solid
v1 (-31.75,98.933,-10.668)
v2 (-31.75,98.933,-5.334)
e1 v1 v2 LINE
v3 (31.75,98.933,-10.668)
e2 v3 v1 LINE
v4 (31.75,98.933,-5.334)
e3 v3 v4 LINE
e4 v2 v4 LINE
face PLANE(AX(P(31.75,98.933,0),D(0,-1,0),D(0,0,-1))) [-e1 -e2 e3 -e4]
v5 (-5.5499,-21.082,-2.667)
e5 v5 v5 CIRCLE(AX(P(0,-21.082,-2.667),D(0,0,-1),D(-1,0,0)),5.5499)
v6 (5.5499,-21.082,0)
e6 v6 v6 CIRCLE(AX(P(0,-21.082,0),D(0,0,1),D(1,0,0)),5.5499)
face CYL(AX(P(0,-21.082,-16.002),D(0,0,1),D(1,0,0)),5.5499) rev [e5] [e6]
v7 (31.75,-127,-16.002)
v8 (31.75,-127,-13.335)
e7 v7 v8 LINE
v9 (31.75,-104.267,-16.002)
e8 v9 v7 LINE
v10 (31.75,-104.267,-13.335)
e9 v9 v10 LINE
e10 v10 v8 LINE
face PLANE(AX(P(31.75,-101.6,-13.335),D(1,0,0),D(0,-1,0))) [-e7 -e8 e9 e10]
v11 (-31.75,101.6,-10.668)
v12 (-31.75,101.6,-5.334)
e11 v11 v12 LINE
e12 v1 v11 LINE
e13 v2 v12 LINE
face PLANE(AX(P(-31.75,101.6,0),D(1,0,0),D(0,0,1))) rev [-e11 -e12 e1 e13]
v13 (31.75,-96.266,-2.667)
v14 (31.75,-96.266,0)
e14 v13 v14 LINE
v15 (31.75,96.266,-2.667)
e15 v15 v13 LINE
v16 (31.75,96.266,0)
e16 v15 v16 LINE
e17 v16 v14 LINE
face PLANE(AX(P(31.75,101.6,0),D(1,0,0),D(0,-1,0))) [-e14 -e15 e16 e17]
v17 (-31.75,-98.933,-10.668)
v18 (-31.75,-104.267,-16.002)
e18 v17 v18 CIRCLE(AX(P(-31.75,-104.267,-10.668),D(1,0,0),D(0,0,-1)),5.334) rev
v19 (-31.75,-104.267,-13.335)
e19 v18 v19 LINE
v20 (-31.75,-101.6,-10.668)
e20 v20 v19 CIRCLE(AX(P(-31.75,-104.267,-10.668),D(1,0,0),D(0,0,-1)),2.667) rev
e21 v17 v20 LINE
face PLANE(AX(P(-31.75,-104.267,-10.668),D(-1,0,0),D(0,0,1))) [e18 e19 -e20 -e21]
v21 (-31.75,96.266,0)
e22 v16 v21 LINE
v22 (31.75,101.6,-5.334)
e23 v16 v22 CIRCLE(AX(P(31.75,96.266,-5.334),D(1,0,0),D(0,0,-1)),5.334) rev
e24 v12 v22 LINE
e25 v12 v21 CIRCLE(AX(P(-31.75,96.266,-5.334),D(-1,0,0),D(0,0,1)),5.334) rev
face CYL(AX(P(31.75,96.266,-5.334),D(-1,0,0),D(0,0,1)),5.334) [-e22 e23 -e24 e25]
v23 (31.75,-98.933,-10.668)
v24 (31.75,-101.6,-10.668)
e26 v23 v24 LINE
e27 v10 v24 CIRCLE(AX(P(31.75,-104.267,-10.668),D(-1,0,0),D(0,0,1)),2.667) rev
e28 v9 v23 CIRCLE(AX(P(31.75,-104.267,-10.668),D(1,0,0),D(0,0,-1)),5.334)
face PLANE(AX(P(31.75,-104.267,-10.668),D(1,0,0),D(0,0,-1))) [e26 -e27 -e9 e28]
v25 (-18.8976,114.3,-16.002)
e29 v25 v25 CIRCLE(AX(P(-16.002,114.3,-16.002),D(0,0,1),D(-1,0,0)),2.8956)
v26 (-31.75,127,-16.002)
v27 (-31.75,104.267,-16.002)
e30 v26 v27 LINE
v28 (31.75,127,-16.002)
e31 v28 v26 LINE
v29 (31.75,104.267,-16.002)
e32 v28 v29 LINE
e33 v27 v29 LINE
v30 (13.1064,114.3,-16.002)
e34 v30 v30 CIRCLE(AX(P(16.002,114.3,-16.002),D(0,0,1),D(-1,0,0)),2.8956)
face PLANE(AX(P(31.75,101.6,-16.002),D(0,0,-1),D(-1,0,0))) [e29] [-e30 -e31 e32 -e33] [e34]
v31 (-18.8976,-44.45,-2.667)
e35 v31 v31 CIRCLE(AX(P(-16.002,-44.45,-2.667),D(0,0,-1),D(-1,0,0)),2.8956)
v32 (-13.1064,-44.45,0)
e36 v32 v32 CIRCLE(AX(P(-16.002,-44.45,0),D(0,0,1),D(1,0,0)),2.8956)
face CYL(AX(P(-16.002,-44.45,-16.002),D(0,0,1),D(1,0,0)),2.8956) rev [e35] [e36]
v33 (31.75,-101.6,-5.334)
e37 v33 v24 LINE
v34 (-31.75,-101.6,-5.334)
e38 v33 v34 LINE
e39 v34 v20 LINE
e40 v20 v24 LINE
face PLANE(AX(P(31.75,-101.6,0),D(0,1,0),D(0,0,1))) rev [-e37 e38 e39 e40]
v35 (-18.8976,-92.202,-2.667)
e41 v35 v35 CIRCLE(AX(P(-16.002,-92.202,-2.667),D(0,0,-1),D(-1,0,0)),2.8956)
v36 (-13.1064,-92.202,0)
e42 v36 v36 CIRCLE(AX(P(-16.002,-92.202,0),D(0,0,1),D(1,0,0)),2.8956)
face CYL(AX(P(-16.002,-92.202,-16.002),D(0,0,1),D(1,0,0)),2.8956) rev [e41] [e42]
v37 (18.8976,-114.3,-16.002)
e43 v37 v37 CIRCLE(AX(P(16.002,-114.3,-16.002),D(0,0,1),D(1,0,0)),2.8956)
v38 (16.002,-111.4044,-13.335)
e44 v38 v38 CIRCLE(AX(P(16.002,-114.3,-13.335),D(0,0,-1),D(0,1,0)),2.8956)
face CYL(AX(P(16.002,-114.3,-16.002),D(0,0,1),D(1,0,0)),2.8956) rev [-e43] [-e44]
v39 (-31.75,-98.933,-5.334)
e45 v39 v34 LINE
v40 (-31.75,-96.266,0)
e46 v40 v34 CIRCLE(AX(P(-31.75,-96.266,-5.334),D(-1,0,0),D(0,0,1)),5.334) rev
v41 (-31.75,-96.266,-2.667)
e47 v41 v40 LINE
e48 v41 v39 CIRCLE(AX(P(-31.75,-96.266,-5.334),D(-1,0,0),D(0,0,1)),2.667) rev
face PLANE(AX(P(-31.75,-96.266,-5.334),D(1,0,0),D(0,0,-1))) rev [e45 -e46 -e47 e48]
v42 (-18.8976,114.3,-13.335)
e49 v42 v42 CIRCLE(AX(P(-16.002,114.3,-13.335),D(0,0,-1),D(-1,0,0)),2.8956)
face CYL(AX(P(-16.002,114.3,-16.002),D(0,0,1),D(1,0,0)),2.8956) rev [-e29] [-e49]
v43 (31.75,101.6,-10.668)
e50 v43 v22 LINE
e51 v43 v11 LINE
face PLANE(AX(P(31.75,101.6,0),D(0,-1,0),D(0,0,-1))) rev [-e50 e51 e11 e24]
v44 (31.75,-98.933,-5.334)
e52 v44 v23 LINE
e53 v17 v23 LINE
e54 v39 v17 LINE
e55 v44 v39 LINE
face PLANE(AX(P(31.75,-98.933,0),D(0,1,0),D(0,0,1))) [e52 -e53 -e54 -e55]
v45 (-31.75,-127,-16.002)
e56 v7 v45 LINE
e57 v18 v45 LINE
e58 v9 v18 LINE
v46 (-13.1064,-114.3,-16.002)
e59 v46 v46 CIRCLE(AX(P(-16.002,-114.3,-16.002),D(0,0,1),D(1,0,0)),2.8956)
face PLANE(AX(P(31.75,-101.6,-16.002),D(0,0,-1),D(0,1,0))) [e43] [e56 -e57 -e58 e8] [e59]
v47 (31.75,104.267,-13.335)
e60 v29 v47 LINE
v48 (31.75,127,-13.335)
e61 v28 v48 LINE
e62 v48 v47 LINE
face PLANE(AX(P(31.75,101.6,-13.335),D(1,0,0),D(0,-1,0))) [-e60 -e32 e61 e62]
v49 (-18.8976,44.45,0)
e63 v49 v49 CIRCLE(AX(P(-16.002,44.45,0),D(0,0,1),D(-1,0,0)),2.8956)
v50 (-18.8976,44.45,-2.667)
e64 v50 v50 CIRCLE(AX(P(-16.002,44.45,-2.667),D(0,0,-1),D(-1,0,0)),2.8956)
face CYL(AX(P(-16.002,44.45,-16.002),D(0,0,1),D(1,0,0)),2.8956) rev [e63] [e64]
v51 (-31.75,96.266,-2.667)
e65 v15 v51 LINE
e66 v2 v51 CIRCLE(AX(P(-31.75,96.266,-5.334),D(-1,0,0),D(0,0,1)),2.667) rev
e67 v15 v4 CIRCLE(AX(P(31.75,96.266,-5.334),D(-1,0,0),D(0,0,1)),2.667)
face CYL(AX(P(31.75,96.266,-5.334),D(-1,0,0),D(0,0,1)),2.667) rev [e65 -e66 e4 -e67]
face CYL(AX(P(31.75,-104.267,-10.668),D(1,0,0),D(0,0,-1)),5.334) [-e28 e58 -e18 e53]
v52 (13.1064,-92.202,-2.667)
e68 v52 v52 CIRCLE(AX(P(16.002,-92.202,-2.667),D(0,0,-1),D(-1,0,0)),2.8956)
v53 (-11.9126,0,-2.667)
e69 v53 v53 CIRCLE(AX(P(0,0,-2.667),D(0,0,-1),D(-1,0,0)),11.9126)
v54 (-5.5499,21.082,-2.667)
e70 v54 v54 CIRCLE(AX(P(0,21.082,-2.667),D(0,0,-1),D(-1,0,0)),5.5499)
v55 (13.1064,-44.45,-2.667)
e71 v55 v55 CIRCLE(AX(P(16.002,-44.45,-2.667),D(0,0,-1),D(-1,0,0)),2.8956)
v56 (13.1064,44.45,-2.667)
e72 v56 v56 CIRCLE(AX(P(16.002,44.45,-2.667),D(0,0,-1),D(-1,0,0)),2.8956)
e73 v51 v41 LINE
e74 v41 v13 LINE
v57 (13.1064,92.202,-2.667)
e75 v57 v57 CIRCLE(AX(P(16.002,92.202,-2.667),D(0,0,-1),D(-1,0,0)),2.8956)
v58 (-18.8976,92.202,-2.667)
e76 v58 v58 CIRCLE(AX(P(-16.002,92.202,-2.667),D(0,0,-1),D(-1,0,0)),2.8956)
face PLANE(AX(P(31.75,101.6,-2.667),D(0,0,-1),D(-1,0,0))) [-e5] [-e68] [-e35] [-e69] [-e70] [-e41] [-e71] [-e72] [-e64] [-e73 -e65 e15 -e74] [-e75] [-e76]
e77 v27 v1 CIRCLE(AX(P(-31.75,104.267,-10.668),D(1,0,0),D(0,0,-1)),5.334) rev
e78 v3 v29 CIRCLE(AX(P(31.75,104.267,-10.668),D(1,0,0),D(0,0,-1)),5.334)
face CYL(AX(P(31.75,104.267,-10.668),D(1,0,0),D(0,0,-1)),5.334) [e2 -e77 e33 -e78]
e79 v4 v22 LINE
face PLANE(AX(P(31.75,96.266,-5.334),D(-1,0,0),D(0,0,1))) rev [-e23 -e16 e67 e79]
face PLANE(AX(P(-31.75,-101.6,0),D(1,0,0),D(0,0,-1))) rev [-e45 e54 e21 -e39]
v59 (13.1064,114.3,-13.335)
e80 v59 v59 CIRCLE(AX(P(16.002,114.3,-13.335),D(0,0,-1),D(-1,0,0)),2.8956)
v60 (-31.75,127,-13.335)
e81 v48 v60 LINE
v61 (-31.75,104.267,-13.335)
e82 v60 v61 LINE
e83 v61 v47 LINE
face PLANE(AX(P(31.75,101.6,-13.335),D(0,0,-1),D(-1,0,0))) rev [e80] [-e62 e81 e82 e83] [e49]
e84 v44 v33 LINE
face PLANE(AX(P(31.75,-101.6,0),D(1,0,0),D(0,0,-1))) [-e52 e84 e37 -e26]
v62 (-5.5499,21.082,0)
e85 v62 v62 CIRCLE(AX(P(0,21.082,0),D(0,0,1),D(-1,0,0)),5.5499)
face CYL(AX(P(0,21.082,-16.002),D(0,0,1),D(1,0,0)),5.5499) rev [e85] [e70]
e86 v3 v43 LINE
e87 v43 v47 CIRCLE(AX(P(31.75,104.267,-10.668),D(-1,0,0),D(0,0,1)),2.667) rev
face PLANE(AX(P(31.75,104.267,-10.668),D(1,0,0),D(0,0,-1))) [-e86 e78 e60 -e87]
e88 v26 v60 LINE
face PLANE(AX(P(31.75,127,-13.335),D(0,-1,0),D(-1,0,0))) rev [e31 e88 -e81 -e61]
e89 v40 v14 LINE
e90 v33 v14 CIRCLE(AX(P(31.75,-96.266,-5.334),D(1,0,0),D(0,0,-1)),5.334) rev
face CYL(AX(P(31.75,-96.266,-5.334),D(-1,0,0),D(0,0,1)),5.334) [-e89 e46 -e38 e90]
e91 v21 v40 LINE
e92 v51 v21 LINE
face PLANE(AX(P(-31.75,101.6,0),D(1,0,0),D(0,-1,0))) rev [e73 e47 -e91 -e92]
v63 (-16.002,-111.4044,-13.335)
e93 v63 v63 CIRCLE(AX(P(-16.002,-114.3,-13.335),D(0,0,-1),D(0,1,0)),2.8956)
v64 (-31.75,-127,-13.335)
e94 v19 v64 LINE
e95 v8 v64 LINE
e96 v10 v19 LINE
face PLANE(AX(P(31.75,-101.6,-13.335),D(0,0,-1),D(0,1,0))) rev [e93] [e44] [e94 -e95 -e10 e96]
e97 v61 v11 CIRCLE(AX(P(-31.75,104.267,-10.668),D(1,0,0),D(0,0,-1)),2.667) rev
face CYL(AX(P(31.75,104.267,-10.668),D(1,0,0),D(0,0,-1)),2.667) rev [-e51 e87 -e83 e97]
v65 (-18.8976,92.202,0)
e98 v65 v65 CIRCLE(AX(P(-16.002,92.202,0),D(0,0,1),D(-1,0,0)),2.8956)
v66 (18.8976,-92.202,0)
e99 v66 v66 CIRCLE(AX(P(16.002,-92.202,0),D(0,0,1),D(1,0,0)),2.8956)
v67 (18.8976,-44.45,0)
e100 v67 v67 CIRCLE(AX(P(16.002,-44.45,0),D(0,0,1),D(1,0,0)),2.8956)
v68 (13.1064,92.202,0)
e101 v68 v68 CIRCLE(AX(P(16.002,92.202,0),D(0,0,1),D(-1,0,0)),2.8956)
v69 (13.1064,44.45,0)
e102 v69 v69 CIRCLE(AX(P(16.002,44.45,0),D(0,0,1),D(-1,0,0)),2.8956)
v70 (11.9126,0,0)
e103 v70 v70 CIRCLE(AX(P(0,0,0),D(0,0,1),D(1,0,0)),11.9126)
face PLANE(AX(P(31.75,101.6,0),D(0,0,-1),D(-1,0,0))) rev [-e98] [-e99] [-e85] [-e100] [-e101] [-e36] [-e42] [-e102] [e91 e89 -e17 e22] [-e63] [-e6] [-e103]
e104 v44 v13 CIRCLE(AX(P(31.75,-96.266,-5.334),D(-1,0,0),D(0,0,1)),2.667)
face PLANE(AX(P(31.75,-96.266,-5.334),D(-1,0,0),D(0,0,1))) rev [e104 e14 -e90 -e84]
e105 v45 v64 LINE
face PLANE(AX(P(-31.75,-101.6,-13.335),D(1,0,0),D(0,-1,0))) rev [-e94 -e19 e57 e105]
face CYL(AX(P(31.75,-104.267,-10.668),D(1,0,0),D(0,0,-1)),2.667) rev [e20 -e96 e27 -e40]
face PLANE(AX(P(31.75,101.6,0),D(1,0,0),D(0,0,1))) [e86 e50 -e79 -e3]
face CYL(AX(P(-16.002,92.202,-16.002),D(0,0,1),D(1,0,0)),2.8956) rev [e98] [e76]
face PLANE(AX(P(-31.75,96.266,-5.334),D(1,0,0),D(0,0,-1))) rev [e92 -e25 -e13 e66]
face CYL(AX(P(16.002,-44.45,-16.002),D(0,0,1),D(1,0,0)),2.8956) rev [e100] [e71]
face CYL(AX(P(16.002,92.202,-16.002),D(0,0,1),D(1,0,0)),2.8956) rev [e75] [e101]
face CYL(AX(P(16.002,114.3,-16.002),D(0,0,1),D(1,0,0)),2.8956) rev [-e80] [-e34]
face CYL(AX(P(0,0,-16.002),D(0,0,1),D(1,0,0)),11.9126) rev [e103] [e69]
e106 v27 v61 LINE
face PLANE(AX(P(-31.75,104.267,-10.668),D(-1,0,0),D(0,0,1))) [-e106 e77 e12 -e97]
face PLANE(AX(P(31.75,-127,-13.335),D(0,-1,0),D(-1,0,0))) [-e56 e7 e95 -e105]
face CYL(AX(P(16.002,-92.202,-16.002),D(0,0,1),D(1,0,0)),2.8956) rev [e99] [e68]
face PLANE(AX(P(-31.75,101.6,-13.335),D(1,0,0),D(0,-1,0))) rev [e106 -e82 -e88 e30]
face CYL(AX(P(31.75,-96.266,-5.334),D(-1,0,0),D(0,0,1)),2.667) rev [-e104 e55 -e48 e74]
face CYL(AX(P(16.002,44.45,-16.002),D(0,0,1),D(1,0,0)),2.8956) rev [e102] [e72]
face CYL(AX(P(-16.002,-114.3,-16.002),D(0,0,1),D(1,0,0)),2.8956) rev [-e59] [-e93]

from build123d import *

# Parameters (mm, degrees)
SALIENTE_EXTRUIR1_DEPTH   = 31.75
CONVERTIR_S_LIDO1_START   = -31.75
CONVERTIR_S_LIDO1_DEPTH   = 63.5
CONVERTIR_S_LIDO1_2_DEPTH = 63.5
CROQUIS7_R                = 2.8956
CROQUIS7_R_2              = 5.5499
CROQUIS7_R_3              = 11.9126
CORTAR_EXTRUIR1_DEPTH     = 132.88300309


# Read off the part's stored shape, not the designer's step: Convertir-Sólido1
with BuildPart() as part:
    # Croquis2 → Saliente-Extruir1 (new, symmetric)
    with BuildSketch(Plane(origin=(0, 0, 0), x_dir=(0, 0, -1), z_dir=(1, 0, 0))):
        Polygon((0, 101.6), (0, -101.6), (13.335, -101.6), (13.335, -127), (16.002, -127), (16.002, -98.933), (2.667, -98.933), (2.667, 98.933), (16.002, 98.933), (16.002, 127), (13.335, 127), (13.335, 101.6), align=None)
    extrude(amount=SALIENTE_EXTRUIR1_DEPTH, both=True)

    # Convertir-Sólido1 outline → Convertir-Sólido1 (cut)
    with BuildSketch(Plane.YZ.offset(CONVERTIR_S_LIDO1_START)):
        with BuildLine():
            Line((101.6, 0), (96.266, 0))
            ThreePointArc((96.266, 0), (100.037707571, -1.562292429), (101.6, -5.334))
            Line((101.6, -5.334), (101.6, 0))
        make_face()
        with BuildLine():
            Line((-101.6, 0), (-101.6, -5.334))
            ThreePointArc((-101.6, -5.334), (-100.037707571, -1.562292429), (-96.266, 0))
            Line((-96.266, 0), (-101.6, 0))
        make_face()
        with BuildLine():
            ThreePointArc((104.267, -16.002), (100.495292429, -14.439707571), (98.933, -10.668))
            Line((98.933, -10.668), (98.933, -16.002))
            Line((98.933, -16.002), (104.267, -16.002))
        make_face()
        with BuildLine():
            ThreePointArc((-98.933, -10.668), (-100.495292429, -14.439707571), (-104.267, -16.002))
            Line((-104.267, -16.002), (-98.933, -16.002))
            Line((-98.933, -16.002), (-98.933, -10.668))
        make_face()
    extrude(amount=CONVERTIR_S_LIDO1_DEPTH, mode=Mode.SUBTRACT)

    # Convertir-S_lido1 2 outline → Convertir-S_lido1 2 (add)
    with BuildSketch(Plane.YZ.offset(CONVERTIR_S_LIDO1_START)):
        with BuildLine():
            ThreePointArc((104.267, -13.335), (102.381146215, -12.553853785), (101.6, -10.668))
            Line((101.6, -10.668), (101.6, -13.335))
            Line((101.6, -13.335), (104.267, -13.335))
        make_face()
        with BuildLine():
            ThreePointArc((-101.6, -10.668), (-102.381146215, -12.553853785), (-104.267, -13.335))
            Line((-104.267, -13.335), (-101.6, -13.335))
            Line((-101.6, -13.335), (-101.6, -10.668))
        make_face()
        with BuildLine():
            Line((98.933, -2.667), (96.266, -2.667))
            ThreePointArc((96.266, -2.667), (98.151853785, -3.448146215), (98.933, -5.334))
            Line((98.933, -5.334), (98.933, -2.667))
        make_face()
        with BuildLine():
            Line((-98.933, -2.667), (-98.933, -5.334))
            ThreePointArc((-98.933, -5.334), (-98.151853785, -3.448146215), (-96.266, -2.667))
            Line((-96.266, -2.667), (-98.933, -2.667))
        make_face()
    extrude(amount=CONVERTIR_S_LIDO1_2_DEPTH)

    # Croquis7 → Cortar-Extruir1 (cut, through all)
    with BuildSketch(Plane.XY):
        with Locations((-16.002, -114.3)):
            Circle(CROQUIS7_R)
        with Locations((16.002, -114.3)):
            Circle(CROQUIS7_R)
        with Locations((-16.002, -92.202)):
            Circle(CROQUIS7_R)
        with Locations((16.002, -92.202)):
            Circle(CROQUIS7_R)
        with Locations((-16.002, -44.45)):
            Circle(CROQUIS7_R)
        with Locations((16.002, -44.45)):
            Circle(CROQUIS7_R)
        with Locations((0, -21.082)):
            Circle(CROQUIS7_R_2)
        Circle(CROQUIS7_R_3)
        with Locations(Location((0, 21.082, 0), (0, 0, 180))):
            Circle(CROQUIS7_R_2)
        with Locations(Location((16.002, 44.45, 0), (0, 0, 180))):
            Circle(CROQUIS7_R)
        with Locations(Location((-16.002, 44.45, 0), (0, 0, 180))):
            Circle(CROQUIS7_R)
        with Locations(Location((16.002, 92.202, 0), (0, 0, 180))):
            Circle(CROQUIS7_R)
        with Locations(Location((-16.002, 92.202, 0), (0, 0, 180))):
            Circle(CROQUIS7_R)
        with Locations(Location((16.002, 114.3, 0), (0, 0, 180))):
            Circle(CROQUIS7_R)
        with Locations(Location((-16.002, 114.3, 0), (0, 0, 180))):
            Circle(CROQUIS7_R)
    extrude(amount=-CORTAR_EXTRUIR1_DEPTH, mode=Mode.SUBTRACT)


solid = part.part
